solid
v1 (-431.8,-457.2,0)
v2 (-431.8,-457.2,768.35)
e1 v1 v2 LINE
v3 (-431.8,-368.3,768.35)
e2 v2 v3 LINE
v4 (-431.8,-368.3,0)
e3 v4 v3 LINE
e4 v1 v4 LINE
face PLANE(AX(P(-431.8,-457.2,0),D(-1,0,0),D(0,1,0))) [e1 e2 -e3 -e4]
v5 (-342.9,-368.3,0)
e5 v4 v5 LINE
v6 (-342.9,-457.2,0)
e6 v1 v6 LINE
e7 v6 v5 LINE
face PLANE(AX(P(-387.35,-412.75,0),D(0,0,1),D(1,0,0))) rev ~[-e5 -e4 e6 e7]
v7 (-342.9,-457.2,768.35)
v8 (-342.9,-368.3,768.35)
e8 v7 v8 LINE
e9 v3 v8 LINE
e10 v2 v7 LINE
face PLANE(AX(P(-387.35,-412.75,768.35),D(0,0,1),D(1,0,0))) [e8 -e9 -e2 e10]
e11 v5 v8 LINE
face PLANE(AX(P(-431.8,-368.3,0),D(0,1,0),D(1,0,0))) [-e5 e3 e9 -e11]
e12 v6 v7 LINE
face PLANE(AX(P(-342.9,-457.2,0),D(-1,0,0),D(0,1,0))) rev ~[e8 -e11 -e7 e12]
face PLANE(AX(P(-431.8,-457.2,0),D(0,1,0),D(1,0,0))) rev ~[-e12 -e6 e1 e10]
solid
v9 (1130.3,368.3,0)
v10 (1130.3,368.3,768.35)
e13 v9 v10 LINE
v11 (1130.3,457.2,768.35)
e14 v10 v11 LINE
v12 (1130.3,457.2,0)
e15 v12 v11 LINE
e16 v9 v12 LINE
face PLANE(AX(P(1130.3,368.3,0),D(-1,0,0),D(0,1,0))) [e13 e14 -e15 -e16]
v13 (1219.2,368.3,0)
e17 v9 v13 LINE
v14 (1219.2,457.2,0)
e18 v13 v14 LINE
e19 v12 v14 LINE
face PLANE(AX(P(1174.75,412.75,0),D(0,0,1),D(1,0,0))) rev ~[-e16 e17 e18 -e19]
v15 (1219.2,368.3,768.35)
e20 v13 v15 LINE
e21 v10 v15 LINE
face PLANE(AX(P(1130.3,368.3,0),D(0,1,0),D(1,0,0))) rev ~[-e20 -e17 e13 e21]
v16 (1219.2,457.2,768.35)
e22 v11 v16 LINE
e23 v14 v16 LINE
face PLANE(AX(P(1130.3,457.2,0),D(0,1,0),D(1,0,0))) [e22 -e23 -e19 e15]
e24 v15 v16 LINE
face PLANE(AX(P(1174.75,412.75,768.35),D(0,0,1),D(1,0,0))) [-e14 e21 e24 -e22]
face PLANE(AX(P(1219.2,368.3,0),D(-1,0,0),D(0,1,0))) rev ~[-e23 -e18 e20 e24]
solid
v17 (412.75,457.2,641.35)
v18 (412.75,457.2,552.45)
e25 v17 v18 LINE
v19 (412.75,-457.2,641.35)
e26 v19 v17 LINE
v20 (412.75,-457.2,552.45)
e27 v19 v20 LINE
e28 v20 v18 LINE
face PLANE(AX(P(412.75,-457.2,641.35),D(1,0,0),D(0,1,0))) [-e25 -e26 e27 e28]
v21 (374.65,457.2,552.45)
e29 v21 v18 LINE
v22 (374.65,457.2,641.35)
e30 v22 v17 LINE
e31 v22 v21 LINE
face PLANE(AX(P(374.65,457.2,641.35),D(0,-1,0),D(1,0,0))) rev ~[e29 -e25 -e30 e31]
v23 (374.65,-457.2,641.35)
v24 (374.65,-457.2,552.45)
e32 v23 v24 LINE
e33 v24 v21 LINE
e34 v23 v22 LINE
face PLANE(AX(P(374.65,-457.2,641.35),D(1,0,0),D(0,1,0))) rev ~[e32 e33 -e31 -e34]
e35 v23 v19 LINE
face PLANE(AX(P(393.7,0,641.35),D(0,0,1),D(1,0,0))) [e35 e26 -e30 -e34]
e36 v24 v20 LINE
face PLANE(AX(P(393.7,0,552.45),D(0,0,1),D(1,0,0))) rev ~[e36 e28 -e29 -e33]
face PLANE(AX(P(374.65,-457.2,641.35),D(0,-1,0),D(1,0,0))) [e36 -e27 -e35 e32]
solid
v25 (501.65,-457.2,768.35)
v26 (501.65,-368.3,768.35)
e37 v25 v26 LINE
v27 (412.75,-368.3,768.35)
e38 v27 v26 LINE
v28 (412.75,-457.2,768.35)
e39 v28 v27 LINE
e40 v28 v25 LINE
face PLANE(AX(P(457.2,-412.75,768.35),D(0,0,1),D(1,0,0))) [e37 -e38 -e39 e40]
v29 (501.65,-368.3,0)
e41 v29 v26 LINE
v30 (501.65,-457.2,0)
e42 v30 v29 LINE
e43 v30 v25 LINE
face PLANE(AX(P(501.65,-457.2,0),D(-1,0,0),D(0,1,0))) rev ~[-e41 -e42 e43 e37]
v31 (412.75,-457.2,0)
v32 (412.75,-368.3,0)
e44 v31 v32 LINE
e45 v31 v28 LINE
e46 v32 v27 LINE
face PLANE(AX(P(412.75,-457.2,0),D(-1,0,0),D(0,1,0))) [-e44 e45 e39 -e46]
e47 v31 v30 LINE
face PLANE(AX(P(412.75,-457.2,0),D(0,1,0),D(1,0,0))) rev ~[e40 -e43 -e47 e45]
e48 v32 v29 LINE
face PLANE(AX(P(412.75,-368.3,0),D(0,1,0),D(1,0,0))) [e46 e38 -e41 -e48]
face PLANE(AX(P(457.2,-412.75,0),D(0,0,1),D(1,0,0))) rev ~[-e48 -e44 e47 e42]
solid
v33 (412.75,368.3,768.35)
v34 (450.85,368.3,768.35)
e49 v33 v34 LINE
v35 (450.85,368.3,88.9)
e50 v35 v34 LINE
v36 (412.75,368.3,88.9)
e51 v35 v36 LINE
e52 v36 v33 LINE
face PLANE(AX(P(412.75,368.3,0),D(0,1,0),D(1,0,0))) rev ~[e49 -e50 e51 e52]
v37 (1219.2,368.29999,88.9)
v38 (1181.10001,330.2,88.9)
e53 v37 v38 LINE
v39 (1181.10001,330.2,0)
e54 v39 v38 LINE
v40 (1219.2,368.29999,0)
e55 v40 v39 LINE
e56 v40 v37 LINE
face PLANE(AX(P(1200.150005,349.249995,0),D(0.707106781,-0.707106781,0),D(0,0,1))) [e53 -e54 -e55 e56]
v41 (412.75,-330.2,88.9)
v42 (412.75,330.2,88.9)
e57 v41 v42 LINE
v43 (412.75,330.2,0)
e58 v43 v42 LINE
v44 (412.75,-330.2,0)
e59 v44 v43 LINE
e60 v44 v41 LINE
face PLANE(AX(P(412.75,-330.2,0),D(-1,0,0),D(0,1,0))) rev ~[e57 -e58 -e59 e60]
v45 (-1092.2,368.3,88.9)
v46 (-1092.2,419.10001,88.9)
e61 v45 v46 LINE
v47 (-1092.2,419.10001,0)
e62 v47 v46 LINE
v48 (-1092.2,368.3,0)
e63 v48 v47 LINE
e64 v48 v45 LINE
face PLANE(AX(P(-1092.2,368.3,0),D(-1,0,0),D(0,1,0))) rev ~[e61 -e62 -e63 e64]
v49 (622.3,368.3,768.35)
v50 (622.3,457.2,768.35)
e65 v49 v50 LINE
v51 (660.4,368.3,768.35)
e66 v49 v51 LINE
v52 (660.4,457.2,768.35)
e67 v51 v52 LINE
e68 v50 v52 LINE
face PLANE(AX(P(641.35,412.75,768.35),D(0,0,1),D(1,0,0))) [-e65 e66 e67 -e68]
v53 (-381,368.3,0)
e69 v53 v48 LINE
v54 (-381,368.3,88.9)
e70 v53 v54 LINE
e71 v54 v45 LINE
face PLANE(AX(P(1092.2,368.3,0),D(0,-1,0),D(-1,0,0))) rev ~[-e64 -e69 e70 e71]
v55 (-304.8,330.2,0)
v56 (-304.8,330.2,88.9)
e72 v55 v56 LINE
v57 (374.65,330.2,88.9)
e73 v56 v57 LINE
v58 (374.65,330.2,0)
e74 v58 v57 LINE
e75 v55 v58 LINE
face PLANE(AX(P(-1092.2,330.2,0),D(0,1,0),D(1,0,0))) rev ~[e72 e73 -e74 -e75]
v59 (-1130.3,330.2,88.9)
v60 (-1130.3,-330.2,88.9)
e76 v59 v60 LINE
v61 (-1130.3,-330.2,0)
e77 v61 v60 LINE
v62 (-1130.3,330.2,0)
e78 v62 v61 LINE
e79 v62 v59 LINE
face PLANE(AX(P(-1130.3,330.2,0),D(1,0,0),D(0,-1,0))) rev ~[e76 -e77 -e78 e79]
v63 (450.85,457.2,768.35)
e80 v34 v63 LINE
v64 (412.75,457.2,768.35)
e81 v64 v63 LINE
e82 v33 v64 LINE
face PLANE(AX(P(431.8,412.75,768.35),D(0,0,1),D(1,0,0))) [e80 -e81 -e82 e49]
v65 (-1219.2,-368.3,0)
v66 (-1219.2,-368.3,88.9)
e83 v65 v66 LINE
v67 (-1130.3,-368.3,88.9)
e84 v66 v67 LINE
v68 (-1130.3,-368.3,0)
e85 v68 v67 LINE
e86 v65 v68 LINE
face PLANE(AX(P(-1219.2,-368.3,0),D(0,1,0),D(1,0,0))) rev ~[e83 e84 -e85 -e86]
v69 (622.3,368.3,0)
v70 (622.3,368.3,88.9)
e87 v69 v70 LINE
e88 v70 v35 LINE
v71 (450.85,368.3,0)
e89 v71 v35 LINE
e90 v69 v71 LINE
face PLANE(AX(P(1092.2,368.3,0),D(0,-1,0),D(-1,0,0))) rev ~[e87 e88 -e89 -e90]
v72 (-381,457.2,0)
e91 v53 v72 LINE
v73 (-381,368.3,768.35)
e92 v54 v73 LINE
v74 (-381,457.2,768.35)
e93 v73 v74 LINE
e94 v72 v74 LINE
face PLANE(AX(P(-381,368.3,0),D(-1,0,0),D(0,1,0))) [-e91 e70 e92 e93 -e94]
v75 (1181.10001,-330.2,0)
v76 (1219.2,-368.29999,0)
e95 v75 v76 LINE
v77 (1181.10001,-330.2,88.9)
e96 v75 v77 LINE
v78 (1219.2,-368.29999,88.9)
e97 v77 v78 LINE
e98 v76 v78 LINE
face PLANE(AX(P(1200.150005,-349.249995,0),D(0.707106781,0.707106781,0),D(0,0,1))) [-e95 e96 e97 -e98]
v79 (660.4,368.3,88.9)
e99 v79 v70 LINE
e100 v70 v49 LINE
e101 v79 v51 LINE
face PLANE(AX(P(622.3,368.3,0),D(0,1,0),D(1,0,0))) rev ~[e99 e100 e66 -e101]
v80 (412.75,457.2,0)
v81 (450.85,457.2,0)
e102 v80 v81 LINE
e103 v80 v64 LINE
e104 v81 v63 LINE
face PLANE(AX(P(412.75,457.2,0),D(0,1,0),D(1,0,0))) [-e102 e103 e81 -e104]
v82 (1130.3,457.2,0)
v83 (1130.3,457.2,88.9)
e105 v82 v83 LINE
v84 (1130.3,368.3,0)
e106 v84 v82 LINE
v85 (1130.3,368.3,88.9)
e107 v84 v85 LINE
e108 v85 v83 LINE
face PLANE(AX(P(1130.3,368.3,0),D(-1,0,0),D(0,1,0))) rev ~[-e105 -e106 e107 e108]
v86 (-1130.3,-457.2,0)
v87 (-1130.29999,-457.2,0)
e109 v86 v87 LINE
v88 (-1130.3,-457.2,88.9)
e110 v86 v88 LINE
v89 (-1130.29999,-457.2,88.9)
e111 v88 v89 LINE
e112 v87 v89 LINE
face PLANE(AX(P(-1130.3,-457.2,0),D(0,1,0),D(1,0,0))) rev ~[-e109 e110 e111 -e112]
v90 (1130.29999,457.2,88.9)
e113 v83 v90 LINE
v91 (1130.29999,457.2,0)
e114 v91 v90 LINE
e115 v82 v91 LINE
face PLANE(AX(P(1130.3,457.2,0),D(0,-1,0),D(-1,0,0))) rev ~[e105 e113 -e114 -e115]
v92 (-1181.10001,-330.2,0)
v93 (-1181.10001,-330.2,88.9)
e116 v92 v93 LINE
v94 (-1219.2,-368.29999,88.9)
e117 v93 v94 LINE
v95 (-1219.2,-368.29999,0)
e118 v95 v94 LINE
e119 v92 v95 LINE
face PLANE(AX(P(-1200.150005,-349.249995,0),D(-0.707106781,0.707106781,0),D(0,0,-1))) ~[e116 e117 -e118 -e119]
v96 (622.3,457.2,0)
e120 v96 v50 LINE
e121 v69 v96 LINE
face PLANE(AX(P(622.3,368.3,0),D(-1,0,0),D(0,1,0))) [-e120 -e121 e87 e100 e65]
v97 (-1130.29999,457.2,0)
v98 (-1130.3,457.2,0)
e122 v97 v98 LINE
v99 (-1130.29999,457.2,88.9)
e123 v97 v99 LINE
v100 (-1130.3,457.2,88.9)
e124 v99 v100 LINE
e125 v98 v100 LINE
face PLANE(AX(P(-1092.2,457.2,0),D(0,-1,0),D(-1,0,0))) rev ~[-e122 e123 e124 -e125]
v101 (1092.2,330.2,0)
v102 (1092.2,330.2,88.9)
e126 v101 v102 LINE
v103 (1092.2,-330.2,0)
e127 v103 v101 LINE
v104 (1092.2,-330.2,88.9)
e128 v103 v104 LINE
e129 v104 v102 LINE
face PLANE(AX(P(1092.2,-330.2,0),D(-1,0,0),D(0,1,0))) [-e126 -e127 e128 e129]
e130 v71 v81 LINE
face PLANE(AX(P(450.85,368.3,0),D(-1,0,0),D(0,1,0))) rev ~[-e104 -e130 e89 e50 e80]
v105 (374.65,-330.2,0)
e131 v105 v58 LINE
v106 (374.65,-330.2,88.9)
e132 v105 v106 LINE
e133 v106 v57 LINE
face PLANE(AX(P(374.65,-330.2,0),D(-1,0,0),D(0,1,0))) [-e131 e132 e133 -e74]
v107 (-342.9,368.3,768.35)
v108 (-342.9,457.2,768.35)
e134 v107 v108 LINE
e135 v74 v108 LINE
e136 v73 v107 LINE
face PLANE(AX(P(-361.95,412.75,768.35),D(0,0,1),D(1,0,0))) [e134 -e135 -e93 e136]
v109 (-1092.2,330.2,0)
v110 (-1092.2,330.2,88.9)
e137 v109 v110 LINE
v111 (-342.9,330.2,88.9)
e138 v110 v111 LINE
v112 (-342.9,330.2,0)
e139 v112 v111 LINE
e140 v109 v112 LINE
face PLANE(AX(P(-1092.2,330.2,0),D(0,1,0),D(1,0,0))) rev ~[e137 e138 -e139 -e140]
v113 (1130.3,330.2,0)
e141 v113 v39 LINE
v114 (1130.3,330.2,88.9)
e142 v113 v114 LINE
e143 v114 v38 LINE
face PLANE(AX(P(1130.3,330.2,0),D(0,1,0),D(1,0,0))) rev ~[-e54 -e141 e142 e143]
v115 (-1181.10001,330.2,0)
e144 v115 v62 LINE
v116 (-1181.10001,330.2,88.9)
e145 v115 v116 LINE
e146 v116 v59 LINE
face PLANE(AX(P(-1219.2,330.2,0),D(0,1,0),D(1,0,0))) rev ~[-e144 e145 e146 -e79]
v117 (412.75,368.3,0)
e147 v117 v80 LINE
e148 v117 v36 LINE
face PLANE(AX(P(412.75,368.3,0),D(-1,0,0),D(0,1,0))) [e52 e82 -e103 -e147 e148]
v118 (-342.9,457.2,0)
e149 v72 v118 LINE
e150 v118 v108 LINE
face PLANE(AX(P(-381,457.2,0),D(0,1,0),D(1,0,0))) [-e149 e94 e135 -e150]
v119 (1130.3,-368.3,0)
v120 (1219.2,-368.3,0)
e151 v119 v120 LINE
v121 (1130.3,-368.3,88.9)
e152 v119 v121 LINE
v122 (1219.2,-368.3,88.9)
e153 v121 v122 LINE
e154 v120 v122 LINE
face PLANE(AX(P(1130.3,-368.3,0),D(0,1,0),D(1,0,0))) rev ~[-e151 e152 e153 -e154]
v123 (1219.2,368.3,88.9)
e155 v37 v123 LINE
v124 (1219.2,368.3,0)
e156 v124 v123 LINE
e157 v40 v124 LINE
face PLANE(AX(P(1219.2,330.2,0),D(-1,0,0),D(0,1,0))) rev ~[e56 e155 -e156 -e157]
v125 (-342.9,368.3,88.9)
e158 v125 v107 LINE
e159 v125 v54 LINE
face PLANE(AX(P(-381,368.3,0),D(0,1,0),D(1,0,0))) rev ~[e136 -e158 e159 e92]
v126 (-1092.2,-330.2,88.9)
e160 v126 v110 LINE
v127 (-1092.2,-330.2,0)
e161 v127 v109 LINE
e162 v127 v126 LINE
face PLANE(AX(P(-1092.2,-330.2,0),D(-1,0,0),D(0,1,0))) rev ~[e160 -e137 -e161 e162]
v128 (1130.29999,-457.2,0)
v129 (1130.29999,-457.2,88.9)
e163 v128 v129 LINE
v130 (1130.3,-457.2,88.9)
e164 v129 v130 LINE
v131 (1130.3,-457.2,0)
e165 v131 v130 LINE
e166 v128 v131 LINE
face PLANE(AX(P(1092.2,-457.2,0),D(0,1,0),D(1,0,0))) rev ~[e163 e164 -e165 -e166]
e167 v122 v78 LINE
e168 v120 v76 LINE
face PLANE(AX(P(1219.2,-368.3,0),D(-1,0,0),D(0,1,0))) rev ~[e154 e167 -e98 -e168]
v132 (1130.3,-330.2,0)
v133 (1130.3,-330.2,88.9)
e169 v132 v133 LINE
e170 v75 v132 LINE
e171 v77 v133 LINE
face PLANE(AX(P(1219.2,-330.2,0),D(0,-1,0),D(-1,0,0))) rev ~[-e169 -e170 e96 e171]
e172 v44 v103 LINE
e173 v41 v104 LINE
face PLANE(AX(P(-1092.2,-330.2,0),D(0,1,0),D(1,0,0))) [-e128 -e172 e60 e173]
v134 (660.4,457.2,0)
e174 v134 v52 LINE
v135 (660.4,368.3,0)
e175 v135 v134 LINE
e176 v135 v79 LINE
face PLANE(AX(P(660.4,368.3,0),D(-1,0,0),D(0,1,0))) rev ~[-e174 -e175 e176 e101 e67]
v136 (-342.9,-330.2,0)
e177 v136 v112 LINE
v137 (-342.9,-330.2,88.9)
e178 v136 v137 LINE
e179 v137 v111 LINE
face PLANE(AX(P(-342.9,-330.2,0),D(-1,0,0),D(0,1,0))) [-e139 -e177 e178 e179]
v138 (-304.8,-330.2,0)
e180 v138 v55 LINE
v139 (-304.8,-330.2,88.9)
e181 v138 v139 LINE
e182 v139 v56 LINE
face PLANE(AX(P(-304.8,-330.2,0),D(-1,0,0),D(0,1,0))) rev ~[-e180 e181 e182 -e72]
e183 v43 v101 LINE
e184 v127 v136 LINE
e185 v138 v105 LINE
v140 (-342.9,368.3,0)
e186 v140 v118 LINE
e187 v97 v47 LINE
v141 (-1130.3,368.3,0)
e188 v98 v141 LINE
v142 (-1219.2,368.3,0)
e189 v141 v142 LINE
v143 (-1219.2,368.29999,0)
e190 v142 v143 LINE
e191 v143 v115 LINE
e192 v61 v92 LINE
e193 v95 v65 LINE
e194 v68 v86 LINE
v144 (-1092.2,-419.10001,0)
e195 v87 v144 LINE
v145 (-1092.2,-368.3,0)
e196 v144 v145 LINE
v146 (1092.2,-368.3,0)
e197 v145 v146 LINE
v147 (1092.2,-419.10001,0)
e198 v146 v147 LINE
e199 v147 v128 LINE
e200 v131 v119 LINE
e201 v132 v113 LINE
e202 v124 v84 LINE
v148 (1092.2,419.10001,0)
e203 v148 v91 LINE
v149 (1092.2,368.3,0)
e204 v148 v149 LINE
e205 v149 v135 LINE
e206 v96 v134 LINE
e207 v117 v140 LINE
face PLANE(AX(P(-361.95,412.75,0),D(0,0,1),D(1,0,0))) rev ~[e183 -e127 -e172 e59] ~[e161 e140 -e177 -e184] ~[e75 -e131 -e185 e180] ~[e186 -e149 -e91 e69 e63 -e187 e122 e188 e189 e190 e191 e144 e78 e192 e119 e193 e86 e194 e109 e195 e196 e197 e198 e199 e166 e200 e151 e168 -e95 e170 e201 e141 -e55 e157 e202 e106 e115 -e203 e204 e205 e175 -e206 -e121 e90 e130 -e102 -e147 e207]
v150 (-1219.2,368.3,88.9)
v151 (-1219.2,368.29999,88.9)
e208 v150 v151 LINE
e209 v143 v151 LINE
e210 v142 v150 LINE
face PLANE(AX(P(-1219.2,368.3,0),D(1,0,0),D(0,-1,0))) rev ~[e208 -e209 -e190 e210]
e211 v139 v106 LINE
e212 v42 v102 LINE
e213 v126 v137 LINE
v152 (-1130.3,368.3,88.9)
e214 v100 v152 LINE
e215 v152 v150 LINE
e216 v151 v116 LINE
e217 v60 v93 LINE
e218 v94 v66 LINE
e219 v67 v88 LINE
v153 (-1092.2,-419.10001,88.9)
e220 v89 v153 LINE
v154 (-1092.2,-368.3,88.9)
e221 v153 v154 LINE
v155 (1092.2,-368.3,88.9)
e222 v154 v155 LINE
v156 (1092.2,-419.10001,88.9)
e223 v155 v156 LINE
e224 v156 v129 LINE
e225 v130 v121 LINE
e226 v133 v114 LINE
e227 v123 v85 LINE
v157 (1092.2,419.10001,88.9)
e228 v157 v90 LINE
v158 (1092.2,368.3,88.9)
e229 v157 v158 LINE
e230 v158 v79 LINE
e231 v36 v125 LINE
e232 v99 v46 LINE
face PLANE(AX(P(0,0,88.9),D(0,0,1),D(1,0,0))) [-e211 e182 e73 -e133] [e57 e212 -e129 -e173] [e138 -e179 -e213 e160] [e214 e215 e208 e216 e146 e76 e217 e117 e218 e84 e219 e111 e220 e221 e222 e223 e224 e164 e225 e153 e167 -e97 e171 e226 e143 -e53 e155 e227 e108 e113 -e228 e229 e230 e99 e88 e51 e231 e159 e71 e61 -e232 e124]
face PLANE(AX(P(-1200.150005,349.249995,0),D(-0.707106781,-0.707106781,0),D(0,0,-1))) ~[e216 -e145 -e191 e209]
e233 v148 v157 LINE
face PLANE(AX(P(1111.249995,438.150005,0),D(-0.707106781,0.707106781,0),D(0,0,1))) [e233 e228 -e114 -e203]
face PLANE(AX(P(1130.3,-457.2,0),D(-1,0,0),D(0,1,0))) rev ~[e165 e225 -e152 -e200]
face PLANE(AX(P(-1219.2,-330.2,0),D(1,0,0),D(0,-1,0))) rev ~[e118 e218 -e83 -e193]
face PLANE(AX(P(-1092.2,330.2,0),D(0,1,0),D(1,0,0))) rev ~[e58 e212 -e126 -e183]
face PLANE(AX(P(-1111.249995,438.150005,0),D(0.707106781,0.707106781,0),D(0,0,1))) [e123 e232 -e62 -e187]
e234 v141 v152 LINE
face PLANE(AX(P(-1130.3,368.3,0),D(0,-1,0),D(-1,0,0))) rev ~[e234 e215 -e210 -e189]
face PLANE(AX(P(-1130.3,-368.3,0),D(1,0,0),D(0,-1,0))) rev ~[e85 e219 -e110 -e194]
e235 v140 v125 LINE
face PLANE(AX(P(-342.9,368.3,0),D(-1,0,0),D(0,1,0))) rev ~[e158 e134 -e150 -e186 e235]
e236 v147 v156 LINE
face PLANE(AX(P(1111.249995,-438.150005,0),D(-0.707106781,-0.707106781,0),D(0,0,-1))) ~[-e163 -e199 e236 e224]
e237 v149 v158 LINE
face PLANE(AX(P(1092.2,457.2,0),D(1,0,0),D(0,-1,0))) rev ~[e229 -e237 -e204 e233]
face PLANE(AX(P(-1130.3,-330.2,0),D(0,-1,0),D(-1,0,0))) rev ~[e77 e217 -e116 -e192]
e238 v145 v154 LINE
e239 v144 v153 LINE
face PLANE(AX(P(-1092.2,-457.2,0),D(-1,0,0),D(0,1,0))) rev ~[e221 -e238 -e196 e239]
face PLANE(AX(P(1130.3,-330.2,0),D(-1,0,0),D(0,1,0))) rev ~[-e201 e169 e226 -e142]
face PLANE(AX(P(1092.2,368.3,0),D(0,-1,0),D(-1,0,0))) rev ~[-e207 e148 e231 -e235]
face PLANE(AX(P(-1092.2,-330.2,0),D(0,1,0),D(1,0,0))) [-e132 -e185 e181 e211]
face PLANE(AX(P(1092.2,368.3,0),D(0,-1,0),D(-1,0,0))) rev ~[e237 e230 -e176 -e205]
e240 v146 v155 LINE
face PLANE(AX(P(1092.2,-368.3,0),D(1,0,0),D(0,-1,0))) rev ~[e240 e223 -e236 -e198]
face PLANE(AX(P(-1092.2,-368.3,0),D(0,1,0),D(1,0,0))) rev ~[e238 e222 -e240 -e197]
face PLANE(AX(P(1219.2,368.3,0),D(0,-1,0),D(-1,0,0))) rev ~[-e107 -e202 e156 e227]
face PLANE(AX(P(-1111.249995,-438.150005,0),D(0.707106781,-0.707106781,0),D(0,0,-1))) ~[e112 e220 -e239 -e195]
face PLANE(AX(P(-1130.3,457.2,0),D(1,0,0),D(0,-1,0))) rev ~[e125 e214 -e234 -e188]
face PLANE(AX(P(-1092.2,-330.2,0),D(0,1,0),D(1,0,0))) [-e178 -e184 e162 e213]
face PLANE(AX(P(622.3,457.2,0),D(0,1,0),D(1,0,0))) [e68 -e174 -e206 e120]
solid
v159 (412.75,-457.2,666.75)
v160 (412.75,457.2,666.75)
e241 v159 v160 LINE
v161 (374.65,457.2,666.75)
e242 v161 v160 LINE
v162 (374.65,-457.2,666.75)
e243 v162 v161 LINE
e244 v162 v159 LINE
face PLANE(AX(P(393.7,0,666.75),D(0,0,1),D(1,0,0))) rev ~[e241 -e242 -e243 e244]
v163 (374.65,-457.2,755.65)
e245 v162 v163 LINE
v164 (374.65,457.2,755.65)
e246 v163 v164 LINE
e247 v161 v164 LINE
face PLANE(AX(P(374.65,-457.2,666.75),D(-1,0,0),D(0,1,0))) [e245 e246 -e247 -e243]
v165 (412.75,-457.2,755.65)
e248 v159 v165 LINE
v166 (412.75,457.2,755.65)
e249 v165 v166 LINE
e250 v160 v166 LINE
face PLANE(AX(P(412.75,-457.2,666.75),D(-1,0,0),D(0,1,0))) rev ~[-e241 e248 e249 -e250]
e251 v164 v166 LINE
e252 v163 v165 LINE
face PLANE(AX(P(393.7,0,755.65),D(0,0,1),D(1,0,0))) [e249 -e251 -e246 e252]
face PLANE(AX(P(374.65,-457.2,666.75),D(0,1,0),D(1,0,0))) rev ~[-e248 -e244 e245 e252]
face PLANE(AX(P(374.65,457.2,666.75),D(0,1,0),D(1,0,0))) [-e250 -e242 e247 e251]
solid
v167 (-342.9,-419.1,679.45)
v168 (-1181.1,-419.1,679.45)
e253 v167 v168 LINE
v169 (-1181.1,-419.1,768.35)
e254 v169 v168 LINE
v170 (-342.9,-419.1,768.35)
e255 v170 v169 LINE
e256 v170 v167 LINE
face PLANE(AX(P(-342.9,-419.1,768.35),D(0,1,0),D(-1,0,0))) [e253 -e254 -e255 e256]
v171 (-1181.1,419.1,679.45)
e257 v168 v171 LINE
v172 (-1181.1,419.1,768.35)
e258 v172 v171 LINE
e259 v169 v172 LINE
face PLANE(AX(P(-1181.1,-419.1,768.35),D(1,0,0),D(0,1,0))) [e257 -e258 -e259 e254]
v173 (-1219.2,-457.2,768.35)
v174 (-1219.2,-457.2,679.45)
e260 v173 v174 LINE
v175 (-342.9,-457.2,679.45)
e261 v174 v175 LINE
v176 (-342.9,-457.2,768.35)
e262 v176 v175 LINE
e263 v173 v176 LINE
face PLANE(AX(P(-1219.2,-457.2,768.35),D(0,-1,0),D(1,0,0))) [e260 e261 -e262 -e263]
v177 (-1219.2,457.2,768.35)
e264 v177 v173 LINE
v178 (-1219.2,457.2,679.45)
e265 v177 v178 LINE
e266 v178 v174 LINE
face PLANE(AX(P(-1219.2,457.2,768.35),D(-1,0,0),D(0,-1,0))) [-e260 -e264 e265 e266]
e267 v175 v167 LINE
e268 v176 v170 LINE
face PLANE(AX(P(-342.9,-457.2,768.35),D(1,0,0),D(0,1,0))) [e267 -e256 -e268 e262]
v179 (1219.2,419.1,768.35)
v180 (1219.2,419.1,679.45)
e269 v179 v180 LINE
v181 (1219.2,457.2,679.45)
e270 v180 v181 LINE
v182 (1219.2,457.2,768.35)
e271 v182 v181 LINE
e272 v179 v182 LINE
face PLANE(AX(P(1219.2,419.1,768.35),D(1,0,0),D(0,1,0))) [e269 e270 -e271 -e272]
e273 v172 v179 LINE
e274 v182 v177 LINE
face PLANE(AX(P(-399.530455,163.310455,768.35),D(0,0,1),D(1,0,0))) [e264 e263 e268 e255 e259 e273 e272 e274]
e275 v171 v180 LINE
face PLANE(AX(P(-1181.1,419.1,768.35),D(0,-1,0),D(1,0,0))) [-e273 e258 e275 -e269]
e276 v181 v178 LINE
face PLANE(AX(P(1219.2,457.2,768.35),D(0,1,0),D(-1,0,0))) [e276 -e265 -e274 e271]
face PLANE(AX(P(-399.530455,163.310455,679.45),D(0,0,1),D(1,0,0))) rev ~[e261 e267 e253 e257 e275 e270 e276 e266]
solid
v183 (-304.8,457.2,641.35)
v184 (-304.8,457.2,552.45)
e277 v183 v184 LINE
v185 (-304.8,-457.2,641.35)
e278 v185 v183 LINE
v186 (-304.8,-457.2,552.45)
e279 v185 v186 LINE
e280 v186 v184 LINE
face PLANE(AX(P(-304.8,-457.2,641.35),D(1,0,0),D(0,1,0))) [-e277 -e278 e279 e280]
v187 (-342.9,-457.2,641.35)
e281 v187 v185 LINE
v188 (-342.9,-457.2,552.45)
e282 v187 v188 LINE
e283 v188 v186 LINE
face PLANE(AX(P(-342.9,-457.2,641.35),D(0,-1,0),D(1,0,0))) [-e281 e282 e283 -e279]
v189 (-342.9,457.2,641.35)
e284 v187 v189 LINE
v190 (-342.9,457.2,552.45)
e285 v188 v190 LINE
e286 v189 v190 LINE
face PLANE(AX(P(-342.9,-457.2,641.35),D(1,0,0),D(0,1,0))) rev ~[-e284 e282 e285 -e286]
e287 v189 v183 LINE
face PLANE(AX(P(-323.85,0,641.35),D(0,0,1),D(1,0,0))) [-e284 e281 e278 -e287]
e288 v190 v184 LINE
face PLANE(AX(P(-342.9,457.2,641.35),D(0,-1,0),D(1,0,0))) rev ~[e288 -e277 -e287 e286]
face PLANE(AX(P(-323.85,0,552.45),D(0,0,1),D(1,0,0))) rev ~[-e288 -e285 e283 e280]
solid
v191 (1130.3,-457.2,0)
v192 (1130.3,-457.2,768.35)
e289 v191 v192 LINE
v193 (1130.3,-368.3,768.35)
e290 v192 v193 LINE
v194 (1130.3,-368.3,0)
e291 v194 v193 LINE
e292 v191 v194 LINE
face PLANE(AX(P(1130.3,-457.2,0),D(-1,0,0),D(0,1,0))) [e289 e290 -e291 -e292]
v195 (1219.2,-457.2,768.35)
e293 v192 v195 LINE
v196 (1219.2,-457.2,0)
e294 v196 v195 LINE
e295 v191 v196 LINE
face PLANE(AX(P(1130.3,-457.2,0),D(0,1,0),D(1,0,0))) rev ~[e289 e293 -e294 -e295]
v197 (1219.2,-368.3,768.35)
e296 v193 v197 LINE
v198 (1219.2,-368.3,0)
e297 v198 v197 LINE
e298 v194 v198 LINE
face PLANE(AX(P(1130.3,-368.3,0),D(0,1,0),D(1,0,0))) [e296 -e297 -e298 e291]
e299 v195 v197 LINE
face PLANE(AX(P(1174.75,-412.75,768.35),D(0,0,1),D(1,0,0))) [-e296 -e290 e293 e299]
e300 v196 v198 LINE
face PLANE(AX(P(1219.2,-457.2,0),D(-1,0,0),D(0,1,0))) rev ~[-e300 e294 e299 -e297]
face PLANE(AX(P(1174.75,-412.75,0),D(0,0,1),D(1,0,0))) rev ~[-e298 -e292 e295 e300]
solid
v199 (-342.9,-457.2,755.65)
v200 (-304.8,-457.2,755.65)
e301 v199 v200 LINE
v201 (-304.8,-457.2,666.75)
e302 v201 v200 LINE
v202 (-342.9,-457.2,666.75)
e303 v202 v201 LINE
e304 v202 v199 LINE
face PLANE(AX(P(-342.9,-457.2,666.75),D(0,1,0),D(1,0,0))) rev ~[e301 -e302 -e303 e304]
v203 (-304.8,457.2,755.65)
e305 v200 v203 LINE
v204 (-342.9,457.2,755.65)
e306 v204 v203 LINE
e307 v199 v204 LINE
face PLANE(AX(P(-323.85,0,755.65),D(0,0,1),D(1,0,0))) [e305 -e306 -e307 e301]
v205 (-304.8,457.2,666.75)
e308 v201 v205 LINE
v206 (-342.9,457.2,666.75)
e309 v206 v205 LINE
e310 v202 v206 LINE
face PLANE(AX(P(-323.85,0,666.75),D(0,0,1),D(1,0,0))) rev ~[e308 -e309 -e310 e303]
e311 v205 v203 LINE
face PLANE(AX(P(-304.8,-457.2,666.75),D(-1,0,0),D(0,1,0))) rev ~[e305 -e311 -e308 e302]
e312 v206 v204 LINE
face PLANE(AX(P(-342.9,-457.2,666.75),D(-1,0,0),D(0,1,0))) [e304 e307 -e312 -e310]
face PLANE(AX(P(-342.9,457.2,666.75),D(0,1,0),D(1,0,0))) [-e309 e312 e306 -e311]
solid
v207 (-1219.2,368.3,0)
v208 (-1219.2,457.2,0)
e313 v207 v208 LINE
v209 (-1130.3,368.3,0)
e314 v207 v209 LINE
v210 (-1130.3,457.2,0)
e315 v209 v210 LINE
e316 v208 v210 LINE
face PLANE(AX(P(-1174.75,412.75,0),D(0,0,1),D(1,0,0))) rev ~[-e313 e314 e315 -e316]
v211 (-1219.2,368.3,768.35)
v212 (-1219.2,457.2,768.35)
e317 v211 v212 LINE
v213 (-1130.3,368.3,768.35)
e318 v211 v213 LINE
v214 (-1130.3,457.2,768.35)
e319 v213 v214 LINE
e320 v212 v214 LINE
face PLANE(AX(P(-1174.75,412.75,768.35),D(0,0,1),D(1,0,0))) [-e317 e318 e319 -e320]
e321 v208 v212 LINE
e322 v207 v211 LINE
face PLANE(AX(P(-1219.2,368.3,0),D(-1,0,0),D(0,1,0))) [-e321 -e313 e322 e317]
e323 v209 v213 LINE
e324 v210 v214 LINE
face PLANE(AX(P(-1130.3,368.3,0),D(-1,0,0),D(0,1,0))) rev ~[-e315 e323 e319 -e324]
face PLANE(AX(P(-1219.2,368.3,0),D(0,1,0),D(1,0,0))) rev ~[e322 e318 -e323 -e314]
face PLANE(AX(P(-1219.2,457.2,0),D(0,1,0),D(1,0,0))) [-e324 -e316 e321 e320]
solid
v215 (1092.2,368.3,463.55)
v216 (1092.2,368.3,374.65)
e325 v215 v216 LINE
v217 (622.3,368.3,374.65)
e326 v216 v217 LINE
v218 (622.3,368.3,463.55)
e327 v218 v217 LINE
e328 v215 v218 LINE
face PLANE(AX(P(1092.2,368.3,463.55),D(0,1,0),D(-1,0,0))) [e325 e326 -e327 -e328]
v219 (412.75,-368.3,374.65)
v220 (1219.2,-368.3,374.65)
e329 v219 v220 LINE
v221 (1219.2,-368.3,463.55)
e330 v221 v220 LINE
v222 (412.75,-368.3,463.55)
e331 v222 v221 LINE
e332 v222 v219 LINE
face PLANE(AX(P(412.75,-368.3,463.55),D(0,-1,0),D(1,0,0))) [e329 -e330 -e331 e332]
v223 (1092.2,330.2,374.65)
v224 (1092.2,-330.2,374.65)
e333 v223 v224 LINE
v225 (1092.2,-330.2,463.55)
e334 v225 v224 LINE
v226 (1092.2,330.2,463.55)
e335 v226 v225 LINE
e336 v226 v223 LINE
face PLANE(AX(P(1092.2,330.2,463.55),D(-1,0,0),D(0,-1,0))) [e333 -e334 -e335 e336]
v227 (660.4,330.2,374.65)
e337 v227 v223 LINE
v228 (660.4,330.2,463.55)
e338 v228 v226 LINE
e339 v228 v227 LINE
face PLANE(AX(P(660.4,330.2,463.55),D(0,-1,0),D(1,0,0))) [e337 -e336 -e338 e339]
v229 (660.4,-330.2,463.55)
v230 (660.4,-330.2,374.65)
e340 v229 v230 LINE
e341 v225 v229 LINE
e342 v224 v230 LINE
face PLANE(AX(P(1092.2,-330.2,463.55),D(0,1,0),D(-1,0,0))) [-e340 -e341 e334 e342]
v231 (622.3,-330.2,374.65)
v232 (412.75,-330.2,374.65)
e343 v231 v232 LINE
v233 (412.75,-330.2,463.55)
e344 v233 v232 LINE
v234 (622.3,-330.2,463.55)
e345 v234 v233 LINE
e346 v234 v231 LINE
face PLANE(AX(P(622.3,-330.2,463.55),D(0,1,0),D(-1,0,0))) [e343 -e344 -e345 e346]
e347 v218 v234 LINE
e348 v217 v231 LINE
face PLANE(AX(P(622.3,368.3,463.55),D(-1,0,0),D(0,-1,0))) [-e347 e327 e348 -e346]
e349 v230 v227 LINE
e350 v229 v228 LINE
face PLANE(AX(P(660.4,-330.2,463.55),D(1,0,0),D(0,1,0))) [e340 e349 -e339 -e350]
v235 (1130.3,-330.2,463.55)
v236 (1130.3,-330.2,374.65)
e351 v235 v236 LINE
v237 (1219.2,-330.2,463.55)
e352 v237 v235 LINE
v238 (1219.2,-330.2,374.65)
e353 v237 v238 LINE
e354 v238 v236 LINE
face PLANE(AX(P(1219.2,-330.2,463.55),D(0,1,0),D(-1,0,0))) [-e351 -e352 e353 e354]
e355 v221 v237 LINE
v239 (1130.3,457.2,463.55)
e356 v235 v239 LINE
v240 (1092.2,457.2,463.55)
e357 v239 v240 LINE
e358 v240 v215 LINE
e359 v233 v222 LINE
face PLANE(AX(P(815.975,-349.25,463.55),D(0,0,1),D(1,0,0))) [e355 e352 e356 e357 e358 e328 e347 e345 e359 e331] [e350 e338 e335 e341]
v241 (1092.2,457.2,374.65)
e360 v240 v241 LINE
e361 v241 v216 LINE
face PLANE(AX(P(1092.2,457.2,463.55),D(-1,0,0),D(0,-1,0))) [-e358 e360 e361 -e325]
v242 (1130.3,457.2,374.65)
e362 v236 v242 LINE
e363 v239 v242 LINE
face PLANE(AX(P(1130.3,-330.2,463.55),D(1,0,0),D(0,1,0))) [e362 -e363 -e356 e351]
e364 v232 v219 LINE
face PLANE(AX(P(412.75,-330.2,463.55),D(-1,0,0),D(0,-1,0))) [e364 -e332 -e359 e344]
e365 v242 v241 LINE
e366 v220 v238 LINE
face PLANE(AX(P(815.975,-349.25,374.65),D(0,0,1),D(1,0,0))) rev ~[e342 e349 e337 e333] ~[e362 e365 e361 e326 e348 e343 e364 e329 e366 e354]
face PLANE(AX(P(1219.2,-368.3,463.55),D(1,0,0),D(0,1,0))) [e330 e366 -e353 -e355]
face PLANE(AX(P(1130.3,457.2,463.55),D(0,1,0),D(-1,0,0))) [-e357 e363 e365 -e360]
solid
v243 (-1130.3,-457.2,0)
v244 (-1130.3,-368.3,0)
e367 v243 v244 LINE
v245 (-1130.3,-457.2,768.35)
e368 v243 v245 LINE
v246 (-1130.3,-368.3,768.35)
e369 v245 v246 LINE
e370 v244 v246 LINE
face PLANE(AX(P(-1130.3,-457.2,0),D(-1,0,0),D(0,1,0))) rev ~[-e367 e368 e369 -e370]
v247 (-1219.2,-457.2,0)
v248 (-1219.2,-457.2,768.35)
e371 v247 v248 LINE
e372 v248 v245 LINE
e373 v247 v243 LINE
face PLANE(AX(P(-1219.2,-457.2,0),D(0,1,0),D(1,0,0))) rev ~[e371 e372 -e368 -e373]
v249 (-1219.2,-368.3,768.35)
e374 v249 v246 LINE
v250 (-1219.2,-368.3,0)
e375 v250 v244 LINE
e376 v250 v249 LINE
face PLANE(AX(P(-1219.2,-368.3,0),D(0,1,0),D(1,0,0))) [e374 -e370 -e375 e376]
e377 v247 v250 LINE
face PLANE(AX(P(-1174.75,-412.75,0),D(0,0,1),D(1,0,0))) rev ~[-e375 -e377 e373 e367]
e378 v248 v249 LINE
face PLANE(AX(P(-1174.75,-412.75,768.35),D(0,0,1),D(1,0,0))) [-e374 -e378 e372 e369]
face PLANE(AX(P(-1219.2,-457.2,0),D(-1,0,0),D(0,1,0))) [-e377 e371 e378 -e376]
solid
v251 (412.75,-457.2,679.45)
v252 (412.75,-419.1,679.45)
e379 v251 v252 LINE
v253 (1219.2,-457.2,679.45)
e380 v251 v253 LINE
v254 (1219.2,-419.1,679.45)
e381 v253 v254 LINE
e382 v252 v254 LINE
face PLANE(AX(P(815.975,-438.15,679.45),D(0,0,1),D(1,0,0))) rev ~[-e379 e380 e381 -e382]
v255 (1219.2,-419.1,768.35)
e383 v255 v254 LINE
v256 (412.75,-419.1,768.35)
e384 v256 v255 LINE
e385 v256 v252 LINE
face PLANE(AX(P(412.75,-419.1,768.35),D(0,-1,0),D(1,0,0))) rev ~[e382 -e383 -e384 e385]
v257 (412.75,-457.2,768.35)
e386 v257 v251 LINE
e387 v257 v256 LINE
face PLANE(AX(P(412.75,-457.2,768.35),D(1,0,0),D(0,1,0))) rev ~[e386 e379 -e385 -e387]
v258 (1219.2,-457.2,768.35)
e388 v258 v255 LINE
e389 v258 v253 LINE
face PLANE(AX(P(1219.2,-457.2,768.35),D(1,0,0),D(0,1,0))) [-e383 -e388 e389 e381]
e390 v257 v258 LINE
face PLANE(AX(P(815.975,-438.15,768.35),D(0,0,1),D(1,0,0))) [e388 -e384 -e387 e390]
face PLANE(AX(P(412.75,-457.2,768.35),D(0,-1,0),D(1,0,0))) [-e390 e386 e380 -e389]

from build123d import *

# Parameters (mm, degrees)
F0_W      = 88.9
F0_H      = 88.9
F1_DEPTH  = 768.35
F2_W      = 2184.4
F2_H      = 660.4
F3_DEPTH  = 88.9
F4_SIZE   = 38.09999
F5_W      = 38.1
F5_H      = 660.4
F6_DEPTH  = 88.9
F7_W      = 38.1
F7_H      = 88.9
F8_DEPTH  = 768.35
F13_W     = 38.1
F13_H     = 660.4
F14_DEPTH = 88.9
F15_W     = 38.1
F15_H     = 914.4
F16_DEPTH = 88.9
F17_W     = 38.1
F17_H     = 914.4
F18_DEPTH = 88.9
F19_DEPTH = 88.9
F12_W     = 806.45
F12_H     = 38.1


# Not quite as in the source:
# - a fillet or chamfer is up to 0.001 mm smaller than in the source, because OpenCascade refuses the exact size


with BuildPart() as f1:
    # F0 (on Top) → F1 (new body)
    with BuildSketch(Plane.XY):
        with Locations((-1174.75, -412.75)):
            Rectangle(F0_W, F0_H)
    extrude(amount=F1_DEPTH)


with BuildPart() as f1b:
    # F0 (on Top) → F1, piece 2 (new body)
    with BuildSketch(Plane.XY):
        with Locations((-1174.75, 412.75)):
            Rectangle(F0_W, F0_H)
    extrude(amount=F1_DEPTH)


with BuildPart() as f1c:
    # F0 (on Top) → F1, piece 3 (new body)
    with BuildSketch(Plane.XY):
        with Locations((1174.75, -412.75)):
            Rectangle(F0_W, F0_H)
    extrude(amount=F1_DEPTH)


with BuildPart() as f1d:
    # F0 (on Top) → F1, piece 4 (new body)
    with BuildSketch(Plane.XY):
        with Locations((1174.75, 412.75)):
            Rectangle(F0_W, F0_H)
    extrude(amount=F1_DEPTH)


with BuildPart() as f1e:
    # F0 (on Top) → F1, piece 5 (new body)
    with BuildSketch(Plane.XY):
        with Locations((-387.35, -412.75)):
            Rectangle(F0_W, F0_H)
    extrude(amount=F1_DEPTH)


with BuildPart() as f1f:
    # F0 (on Top) → F1, piece 6 (new body)
    with BuildSketch(Plane.XY):
        with Locations((457.2, -412.75)):
            Rectangle(F0_W, F0_H)
    extrude(amount=F1_DEPTH)


with BuildPart() as f3:
    # F2 (on Top) → F3 (new body)
    with BuildSketch(Plane.XY):
        Polygon((-1130.3, 368.3), (-1219.2, 368.3), (-1219.2, 330.2), (-1130.3, 330.2), (-1130.3, -330.2), (-1219.2, -330.2), (-1219.2, -368.3), (-1130.3, -368.3), (-1130.3, -457.2), (-1092.2, -457.2), (-1092.2, -368.3), (1092.2, -368.3), (1092.2, -457.2), (1130.3, -457.2), (1130.3, -368.3), (1219.2, -368.3), (1219.2, -330.2), (1130.3, -330.2), (1130.3, 330.2), (1219.2, 330.2), (1219.2, 368.3), (1130.3, 368.3), (1130.3, 457.2), (1092.2, 457.2), (1092.2, 368.3), (-1092.2, 368.3), (-1092.2, 457.2), (-1130.3, 457.2), align=None)
        Rectangle(F2_W, F2_H, mode=Mode.SUBTRACT)
    extrude(amount=F3_DEPTH)

    # F4 (size 38.1 in the source; OpenCascade refuses exactly that, so slightly less here)
    f4_edges = [f3.edges().sort_by_distance(p)[0] for p in [
        (-1219.2, 330.2, 44.45),
        (-1219.2, -330.2, 44.45),
        (-1092.2, -457.2, 44.45),
        (1092.2, -457.2, 44.45),
        (1219.2, 330.2, 44.45),
        (1092.2, 457.2, 44.45),
        (1219.2, -330.2, 44.45),
        (-1092.2, 457.2, 44.45),
    ]]
    chamfer(f4_edges, length=F4_SIZE)

    # F5 (on Top) → F6 (join, through all)
    with BuildSketch(Plane.XY):
        with Locations((-323.85, 0)):
            Rectangle(F5_W, F5_H)
        with Locations((393.7, 0)):
            Rectangle(F5_W, F5_H)
    extrude(amount=F6_DEPTH)

    # F7 (on Top) → F8 (join, through all)
    with BuildSketch(Plane.XY):
        with Locations((-361.95, 412.75)):
            Rectangle(F7_W, F7_H)
        with Locations((431.8, 412.75)):
            Rectangle(F7_W, F7_H)
        with Locations((641.35, 412.75)):
            Rectangle(F7_W, F7_H)
    extrude(amount=F8_DEPTH)


with BuildPart() as f14:
    # F13 (on offset) → F14 (new body)
    with BuildSketch(Plane.XY.offset(463.55)):
        Polygon((622.3, -330.2), (412.75, -330.2), (412.75, -368.3), (1219.2, -368.3), (1219.2, -330.2), (1130.3, -330.2), (1092.2, -330.2), (660.4, -330.2), align=None)
        with Locations((641.35, 0)):
            Rectangle(F13_W, F13_H)
        Polygon((622.3, 368.3), (622.3, 330.2), (660.4, 330.2), (1092.2, 330.2), (1092.2, 368.3), align=None)
        Polygon((1092.2, 330.2), (1092.2, -330.2), (1130.3, -330.2), (1130.3, 457.2), (1092.2, 457.2), (1092.2, 368.3), align=None)
    extrude(amount=-F14_DEPTH)


with BuildPart() as f16:
    # F15 (on offset) → F16 (new body)
    with BuildSketch(Plane.XY.offset(641.35)):
        with Locations((-323.85, 0)):
            Rectangle(F15_W, F15_H)
    extrude(amount=-F16_DEPTH)


with BuildPart() as f16b:
    # F15 (on offset) → F16, piece 2 (new body)
    with BuildSketch(Plane.XY.offset(641.35)):
        with Locations((393.7, 0)):
            Rectangle(F15_W, F15_H)
    extrude(amount=-F16_DEPTH)


with BuildPart() as f18:
    # F17 (on offset) → F18 (new body)
    with BuildSketch(Plane.XY.offset(666.75)):
        with Locations((-323.85, 0)):
            Rectangle(F17_W, F17_H)
    extrude(amount=F18_DEPTH)


with BuildPart() as f18b:
    # F17 (on offset) → F18, piece 2 (new body)
    with BuildSketch(Plane.XY.offset(666.75)):
        with Locations((393.7, 0)):
            Rectangle(F17_W, F17_H)
    extrude(amount=F18_DEPTH)


with BuildPart() as f19:
    # F12 (on face) → F19 (new body)
    with BuildSketch(Plane.XY.offset(768.35)):
        Polygon((1219.2, 457.2), (-1219.2, 457.2), (-1219.2, 419.1), (-1219.2, -457.2), (-1181.1, -457.2), (-342.9, -457.2), (-342.9, -419.1), (-1181.1, -419.1), (-1181.1, 419.1), (1219.2, 419.1), align=None)
    extrude(amount=-F19_DEPTH)


with BuildPart() as f19b:
    # F12 (on face) → F19, piece 2 (new body)
    with BuildSketch(Plane.XY.offset(768.35)):
        with Locations((815.975, -438.15)):
            Rectangle(F12_W, F12_H)
    extrude(amount=-F19_DEPTH)


solid = Compound([f1.part, f1b.part, f1c.part, f1d.part, f1e.part, f1f.part, f3.part, f14.part, f16.part, f16b.part, f18.part, f18b.part, f19.part, f19b.part])
